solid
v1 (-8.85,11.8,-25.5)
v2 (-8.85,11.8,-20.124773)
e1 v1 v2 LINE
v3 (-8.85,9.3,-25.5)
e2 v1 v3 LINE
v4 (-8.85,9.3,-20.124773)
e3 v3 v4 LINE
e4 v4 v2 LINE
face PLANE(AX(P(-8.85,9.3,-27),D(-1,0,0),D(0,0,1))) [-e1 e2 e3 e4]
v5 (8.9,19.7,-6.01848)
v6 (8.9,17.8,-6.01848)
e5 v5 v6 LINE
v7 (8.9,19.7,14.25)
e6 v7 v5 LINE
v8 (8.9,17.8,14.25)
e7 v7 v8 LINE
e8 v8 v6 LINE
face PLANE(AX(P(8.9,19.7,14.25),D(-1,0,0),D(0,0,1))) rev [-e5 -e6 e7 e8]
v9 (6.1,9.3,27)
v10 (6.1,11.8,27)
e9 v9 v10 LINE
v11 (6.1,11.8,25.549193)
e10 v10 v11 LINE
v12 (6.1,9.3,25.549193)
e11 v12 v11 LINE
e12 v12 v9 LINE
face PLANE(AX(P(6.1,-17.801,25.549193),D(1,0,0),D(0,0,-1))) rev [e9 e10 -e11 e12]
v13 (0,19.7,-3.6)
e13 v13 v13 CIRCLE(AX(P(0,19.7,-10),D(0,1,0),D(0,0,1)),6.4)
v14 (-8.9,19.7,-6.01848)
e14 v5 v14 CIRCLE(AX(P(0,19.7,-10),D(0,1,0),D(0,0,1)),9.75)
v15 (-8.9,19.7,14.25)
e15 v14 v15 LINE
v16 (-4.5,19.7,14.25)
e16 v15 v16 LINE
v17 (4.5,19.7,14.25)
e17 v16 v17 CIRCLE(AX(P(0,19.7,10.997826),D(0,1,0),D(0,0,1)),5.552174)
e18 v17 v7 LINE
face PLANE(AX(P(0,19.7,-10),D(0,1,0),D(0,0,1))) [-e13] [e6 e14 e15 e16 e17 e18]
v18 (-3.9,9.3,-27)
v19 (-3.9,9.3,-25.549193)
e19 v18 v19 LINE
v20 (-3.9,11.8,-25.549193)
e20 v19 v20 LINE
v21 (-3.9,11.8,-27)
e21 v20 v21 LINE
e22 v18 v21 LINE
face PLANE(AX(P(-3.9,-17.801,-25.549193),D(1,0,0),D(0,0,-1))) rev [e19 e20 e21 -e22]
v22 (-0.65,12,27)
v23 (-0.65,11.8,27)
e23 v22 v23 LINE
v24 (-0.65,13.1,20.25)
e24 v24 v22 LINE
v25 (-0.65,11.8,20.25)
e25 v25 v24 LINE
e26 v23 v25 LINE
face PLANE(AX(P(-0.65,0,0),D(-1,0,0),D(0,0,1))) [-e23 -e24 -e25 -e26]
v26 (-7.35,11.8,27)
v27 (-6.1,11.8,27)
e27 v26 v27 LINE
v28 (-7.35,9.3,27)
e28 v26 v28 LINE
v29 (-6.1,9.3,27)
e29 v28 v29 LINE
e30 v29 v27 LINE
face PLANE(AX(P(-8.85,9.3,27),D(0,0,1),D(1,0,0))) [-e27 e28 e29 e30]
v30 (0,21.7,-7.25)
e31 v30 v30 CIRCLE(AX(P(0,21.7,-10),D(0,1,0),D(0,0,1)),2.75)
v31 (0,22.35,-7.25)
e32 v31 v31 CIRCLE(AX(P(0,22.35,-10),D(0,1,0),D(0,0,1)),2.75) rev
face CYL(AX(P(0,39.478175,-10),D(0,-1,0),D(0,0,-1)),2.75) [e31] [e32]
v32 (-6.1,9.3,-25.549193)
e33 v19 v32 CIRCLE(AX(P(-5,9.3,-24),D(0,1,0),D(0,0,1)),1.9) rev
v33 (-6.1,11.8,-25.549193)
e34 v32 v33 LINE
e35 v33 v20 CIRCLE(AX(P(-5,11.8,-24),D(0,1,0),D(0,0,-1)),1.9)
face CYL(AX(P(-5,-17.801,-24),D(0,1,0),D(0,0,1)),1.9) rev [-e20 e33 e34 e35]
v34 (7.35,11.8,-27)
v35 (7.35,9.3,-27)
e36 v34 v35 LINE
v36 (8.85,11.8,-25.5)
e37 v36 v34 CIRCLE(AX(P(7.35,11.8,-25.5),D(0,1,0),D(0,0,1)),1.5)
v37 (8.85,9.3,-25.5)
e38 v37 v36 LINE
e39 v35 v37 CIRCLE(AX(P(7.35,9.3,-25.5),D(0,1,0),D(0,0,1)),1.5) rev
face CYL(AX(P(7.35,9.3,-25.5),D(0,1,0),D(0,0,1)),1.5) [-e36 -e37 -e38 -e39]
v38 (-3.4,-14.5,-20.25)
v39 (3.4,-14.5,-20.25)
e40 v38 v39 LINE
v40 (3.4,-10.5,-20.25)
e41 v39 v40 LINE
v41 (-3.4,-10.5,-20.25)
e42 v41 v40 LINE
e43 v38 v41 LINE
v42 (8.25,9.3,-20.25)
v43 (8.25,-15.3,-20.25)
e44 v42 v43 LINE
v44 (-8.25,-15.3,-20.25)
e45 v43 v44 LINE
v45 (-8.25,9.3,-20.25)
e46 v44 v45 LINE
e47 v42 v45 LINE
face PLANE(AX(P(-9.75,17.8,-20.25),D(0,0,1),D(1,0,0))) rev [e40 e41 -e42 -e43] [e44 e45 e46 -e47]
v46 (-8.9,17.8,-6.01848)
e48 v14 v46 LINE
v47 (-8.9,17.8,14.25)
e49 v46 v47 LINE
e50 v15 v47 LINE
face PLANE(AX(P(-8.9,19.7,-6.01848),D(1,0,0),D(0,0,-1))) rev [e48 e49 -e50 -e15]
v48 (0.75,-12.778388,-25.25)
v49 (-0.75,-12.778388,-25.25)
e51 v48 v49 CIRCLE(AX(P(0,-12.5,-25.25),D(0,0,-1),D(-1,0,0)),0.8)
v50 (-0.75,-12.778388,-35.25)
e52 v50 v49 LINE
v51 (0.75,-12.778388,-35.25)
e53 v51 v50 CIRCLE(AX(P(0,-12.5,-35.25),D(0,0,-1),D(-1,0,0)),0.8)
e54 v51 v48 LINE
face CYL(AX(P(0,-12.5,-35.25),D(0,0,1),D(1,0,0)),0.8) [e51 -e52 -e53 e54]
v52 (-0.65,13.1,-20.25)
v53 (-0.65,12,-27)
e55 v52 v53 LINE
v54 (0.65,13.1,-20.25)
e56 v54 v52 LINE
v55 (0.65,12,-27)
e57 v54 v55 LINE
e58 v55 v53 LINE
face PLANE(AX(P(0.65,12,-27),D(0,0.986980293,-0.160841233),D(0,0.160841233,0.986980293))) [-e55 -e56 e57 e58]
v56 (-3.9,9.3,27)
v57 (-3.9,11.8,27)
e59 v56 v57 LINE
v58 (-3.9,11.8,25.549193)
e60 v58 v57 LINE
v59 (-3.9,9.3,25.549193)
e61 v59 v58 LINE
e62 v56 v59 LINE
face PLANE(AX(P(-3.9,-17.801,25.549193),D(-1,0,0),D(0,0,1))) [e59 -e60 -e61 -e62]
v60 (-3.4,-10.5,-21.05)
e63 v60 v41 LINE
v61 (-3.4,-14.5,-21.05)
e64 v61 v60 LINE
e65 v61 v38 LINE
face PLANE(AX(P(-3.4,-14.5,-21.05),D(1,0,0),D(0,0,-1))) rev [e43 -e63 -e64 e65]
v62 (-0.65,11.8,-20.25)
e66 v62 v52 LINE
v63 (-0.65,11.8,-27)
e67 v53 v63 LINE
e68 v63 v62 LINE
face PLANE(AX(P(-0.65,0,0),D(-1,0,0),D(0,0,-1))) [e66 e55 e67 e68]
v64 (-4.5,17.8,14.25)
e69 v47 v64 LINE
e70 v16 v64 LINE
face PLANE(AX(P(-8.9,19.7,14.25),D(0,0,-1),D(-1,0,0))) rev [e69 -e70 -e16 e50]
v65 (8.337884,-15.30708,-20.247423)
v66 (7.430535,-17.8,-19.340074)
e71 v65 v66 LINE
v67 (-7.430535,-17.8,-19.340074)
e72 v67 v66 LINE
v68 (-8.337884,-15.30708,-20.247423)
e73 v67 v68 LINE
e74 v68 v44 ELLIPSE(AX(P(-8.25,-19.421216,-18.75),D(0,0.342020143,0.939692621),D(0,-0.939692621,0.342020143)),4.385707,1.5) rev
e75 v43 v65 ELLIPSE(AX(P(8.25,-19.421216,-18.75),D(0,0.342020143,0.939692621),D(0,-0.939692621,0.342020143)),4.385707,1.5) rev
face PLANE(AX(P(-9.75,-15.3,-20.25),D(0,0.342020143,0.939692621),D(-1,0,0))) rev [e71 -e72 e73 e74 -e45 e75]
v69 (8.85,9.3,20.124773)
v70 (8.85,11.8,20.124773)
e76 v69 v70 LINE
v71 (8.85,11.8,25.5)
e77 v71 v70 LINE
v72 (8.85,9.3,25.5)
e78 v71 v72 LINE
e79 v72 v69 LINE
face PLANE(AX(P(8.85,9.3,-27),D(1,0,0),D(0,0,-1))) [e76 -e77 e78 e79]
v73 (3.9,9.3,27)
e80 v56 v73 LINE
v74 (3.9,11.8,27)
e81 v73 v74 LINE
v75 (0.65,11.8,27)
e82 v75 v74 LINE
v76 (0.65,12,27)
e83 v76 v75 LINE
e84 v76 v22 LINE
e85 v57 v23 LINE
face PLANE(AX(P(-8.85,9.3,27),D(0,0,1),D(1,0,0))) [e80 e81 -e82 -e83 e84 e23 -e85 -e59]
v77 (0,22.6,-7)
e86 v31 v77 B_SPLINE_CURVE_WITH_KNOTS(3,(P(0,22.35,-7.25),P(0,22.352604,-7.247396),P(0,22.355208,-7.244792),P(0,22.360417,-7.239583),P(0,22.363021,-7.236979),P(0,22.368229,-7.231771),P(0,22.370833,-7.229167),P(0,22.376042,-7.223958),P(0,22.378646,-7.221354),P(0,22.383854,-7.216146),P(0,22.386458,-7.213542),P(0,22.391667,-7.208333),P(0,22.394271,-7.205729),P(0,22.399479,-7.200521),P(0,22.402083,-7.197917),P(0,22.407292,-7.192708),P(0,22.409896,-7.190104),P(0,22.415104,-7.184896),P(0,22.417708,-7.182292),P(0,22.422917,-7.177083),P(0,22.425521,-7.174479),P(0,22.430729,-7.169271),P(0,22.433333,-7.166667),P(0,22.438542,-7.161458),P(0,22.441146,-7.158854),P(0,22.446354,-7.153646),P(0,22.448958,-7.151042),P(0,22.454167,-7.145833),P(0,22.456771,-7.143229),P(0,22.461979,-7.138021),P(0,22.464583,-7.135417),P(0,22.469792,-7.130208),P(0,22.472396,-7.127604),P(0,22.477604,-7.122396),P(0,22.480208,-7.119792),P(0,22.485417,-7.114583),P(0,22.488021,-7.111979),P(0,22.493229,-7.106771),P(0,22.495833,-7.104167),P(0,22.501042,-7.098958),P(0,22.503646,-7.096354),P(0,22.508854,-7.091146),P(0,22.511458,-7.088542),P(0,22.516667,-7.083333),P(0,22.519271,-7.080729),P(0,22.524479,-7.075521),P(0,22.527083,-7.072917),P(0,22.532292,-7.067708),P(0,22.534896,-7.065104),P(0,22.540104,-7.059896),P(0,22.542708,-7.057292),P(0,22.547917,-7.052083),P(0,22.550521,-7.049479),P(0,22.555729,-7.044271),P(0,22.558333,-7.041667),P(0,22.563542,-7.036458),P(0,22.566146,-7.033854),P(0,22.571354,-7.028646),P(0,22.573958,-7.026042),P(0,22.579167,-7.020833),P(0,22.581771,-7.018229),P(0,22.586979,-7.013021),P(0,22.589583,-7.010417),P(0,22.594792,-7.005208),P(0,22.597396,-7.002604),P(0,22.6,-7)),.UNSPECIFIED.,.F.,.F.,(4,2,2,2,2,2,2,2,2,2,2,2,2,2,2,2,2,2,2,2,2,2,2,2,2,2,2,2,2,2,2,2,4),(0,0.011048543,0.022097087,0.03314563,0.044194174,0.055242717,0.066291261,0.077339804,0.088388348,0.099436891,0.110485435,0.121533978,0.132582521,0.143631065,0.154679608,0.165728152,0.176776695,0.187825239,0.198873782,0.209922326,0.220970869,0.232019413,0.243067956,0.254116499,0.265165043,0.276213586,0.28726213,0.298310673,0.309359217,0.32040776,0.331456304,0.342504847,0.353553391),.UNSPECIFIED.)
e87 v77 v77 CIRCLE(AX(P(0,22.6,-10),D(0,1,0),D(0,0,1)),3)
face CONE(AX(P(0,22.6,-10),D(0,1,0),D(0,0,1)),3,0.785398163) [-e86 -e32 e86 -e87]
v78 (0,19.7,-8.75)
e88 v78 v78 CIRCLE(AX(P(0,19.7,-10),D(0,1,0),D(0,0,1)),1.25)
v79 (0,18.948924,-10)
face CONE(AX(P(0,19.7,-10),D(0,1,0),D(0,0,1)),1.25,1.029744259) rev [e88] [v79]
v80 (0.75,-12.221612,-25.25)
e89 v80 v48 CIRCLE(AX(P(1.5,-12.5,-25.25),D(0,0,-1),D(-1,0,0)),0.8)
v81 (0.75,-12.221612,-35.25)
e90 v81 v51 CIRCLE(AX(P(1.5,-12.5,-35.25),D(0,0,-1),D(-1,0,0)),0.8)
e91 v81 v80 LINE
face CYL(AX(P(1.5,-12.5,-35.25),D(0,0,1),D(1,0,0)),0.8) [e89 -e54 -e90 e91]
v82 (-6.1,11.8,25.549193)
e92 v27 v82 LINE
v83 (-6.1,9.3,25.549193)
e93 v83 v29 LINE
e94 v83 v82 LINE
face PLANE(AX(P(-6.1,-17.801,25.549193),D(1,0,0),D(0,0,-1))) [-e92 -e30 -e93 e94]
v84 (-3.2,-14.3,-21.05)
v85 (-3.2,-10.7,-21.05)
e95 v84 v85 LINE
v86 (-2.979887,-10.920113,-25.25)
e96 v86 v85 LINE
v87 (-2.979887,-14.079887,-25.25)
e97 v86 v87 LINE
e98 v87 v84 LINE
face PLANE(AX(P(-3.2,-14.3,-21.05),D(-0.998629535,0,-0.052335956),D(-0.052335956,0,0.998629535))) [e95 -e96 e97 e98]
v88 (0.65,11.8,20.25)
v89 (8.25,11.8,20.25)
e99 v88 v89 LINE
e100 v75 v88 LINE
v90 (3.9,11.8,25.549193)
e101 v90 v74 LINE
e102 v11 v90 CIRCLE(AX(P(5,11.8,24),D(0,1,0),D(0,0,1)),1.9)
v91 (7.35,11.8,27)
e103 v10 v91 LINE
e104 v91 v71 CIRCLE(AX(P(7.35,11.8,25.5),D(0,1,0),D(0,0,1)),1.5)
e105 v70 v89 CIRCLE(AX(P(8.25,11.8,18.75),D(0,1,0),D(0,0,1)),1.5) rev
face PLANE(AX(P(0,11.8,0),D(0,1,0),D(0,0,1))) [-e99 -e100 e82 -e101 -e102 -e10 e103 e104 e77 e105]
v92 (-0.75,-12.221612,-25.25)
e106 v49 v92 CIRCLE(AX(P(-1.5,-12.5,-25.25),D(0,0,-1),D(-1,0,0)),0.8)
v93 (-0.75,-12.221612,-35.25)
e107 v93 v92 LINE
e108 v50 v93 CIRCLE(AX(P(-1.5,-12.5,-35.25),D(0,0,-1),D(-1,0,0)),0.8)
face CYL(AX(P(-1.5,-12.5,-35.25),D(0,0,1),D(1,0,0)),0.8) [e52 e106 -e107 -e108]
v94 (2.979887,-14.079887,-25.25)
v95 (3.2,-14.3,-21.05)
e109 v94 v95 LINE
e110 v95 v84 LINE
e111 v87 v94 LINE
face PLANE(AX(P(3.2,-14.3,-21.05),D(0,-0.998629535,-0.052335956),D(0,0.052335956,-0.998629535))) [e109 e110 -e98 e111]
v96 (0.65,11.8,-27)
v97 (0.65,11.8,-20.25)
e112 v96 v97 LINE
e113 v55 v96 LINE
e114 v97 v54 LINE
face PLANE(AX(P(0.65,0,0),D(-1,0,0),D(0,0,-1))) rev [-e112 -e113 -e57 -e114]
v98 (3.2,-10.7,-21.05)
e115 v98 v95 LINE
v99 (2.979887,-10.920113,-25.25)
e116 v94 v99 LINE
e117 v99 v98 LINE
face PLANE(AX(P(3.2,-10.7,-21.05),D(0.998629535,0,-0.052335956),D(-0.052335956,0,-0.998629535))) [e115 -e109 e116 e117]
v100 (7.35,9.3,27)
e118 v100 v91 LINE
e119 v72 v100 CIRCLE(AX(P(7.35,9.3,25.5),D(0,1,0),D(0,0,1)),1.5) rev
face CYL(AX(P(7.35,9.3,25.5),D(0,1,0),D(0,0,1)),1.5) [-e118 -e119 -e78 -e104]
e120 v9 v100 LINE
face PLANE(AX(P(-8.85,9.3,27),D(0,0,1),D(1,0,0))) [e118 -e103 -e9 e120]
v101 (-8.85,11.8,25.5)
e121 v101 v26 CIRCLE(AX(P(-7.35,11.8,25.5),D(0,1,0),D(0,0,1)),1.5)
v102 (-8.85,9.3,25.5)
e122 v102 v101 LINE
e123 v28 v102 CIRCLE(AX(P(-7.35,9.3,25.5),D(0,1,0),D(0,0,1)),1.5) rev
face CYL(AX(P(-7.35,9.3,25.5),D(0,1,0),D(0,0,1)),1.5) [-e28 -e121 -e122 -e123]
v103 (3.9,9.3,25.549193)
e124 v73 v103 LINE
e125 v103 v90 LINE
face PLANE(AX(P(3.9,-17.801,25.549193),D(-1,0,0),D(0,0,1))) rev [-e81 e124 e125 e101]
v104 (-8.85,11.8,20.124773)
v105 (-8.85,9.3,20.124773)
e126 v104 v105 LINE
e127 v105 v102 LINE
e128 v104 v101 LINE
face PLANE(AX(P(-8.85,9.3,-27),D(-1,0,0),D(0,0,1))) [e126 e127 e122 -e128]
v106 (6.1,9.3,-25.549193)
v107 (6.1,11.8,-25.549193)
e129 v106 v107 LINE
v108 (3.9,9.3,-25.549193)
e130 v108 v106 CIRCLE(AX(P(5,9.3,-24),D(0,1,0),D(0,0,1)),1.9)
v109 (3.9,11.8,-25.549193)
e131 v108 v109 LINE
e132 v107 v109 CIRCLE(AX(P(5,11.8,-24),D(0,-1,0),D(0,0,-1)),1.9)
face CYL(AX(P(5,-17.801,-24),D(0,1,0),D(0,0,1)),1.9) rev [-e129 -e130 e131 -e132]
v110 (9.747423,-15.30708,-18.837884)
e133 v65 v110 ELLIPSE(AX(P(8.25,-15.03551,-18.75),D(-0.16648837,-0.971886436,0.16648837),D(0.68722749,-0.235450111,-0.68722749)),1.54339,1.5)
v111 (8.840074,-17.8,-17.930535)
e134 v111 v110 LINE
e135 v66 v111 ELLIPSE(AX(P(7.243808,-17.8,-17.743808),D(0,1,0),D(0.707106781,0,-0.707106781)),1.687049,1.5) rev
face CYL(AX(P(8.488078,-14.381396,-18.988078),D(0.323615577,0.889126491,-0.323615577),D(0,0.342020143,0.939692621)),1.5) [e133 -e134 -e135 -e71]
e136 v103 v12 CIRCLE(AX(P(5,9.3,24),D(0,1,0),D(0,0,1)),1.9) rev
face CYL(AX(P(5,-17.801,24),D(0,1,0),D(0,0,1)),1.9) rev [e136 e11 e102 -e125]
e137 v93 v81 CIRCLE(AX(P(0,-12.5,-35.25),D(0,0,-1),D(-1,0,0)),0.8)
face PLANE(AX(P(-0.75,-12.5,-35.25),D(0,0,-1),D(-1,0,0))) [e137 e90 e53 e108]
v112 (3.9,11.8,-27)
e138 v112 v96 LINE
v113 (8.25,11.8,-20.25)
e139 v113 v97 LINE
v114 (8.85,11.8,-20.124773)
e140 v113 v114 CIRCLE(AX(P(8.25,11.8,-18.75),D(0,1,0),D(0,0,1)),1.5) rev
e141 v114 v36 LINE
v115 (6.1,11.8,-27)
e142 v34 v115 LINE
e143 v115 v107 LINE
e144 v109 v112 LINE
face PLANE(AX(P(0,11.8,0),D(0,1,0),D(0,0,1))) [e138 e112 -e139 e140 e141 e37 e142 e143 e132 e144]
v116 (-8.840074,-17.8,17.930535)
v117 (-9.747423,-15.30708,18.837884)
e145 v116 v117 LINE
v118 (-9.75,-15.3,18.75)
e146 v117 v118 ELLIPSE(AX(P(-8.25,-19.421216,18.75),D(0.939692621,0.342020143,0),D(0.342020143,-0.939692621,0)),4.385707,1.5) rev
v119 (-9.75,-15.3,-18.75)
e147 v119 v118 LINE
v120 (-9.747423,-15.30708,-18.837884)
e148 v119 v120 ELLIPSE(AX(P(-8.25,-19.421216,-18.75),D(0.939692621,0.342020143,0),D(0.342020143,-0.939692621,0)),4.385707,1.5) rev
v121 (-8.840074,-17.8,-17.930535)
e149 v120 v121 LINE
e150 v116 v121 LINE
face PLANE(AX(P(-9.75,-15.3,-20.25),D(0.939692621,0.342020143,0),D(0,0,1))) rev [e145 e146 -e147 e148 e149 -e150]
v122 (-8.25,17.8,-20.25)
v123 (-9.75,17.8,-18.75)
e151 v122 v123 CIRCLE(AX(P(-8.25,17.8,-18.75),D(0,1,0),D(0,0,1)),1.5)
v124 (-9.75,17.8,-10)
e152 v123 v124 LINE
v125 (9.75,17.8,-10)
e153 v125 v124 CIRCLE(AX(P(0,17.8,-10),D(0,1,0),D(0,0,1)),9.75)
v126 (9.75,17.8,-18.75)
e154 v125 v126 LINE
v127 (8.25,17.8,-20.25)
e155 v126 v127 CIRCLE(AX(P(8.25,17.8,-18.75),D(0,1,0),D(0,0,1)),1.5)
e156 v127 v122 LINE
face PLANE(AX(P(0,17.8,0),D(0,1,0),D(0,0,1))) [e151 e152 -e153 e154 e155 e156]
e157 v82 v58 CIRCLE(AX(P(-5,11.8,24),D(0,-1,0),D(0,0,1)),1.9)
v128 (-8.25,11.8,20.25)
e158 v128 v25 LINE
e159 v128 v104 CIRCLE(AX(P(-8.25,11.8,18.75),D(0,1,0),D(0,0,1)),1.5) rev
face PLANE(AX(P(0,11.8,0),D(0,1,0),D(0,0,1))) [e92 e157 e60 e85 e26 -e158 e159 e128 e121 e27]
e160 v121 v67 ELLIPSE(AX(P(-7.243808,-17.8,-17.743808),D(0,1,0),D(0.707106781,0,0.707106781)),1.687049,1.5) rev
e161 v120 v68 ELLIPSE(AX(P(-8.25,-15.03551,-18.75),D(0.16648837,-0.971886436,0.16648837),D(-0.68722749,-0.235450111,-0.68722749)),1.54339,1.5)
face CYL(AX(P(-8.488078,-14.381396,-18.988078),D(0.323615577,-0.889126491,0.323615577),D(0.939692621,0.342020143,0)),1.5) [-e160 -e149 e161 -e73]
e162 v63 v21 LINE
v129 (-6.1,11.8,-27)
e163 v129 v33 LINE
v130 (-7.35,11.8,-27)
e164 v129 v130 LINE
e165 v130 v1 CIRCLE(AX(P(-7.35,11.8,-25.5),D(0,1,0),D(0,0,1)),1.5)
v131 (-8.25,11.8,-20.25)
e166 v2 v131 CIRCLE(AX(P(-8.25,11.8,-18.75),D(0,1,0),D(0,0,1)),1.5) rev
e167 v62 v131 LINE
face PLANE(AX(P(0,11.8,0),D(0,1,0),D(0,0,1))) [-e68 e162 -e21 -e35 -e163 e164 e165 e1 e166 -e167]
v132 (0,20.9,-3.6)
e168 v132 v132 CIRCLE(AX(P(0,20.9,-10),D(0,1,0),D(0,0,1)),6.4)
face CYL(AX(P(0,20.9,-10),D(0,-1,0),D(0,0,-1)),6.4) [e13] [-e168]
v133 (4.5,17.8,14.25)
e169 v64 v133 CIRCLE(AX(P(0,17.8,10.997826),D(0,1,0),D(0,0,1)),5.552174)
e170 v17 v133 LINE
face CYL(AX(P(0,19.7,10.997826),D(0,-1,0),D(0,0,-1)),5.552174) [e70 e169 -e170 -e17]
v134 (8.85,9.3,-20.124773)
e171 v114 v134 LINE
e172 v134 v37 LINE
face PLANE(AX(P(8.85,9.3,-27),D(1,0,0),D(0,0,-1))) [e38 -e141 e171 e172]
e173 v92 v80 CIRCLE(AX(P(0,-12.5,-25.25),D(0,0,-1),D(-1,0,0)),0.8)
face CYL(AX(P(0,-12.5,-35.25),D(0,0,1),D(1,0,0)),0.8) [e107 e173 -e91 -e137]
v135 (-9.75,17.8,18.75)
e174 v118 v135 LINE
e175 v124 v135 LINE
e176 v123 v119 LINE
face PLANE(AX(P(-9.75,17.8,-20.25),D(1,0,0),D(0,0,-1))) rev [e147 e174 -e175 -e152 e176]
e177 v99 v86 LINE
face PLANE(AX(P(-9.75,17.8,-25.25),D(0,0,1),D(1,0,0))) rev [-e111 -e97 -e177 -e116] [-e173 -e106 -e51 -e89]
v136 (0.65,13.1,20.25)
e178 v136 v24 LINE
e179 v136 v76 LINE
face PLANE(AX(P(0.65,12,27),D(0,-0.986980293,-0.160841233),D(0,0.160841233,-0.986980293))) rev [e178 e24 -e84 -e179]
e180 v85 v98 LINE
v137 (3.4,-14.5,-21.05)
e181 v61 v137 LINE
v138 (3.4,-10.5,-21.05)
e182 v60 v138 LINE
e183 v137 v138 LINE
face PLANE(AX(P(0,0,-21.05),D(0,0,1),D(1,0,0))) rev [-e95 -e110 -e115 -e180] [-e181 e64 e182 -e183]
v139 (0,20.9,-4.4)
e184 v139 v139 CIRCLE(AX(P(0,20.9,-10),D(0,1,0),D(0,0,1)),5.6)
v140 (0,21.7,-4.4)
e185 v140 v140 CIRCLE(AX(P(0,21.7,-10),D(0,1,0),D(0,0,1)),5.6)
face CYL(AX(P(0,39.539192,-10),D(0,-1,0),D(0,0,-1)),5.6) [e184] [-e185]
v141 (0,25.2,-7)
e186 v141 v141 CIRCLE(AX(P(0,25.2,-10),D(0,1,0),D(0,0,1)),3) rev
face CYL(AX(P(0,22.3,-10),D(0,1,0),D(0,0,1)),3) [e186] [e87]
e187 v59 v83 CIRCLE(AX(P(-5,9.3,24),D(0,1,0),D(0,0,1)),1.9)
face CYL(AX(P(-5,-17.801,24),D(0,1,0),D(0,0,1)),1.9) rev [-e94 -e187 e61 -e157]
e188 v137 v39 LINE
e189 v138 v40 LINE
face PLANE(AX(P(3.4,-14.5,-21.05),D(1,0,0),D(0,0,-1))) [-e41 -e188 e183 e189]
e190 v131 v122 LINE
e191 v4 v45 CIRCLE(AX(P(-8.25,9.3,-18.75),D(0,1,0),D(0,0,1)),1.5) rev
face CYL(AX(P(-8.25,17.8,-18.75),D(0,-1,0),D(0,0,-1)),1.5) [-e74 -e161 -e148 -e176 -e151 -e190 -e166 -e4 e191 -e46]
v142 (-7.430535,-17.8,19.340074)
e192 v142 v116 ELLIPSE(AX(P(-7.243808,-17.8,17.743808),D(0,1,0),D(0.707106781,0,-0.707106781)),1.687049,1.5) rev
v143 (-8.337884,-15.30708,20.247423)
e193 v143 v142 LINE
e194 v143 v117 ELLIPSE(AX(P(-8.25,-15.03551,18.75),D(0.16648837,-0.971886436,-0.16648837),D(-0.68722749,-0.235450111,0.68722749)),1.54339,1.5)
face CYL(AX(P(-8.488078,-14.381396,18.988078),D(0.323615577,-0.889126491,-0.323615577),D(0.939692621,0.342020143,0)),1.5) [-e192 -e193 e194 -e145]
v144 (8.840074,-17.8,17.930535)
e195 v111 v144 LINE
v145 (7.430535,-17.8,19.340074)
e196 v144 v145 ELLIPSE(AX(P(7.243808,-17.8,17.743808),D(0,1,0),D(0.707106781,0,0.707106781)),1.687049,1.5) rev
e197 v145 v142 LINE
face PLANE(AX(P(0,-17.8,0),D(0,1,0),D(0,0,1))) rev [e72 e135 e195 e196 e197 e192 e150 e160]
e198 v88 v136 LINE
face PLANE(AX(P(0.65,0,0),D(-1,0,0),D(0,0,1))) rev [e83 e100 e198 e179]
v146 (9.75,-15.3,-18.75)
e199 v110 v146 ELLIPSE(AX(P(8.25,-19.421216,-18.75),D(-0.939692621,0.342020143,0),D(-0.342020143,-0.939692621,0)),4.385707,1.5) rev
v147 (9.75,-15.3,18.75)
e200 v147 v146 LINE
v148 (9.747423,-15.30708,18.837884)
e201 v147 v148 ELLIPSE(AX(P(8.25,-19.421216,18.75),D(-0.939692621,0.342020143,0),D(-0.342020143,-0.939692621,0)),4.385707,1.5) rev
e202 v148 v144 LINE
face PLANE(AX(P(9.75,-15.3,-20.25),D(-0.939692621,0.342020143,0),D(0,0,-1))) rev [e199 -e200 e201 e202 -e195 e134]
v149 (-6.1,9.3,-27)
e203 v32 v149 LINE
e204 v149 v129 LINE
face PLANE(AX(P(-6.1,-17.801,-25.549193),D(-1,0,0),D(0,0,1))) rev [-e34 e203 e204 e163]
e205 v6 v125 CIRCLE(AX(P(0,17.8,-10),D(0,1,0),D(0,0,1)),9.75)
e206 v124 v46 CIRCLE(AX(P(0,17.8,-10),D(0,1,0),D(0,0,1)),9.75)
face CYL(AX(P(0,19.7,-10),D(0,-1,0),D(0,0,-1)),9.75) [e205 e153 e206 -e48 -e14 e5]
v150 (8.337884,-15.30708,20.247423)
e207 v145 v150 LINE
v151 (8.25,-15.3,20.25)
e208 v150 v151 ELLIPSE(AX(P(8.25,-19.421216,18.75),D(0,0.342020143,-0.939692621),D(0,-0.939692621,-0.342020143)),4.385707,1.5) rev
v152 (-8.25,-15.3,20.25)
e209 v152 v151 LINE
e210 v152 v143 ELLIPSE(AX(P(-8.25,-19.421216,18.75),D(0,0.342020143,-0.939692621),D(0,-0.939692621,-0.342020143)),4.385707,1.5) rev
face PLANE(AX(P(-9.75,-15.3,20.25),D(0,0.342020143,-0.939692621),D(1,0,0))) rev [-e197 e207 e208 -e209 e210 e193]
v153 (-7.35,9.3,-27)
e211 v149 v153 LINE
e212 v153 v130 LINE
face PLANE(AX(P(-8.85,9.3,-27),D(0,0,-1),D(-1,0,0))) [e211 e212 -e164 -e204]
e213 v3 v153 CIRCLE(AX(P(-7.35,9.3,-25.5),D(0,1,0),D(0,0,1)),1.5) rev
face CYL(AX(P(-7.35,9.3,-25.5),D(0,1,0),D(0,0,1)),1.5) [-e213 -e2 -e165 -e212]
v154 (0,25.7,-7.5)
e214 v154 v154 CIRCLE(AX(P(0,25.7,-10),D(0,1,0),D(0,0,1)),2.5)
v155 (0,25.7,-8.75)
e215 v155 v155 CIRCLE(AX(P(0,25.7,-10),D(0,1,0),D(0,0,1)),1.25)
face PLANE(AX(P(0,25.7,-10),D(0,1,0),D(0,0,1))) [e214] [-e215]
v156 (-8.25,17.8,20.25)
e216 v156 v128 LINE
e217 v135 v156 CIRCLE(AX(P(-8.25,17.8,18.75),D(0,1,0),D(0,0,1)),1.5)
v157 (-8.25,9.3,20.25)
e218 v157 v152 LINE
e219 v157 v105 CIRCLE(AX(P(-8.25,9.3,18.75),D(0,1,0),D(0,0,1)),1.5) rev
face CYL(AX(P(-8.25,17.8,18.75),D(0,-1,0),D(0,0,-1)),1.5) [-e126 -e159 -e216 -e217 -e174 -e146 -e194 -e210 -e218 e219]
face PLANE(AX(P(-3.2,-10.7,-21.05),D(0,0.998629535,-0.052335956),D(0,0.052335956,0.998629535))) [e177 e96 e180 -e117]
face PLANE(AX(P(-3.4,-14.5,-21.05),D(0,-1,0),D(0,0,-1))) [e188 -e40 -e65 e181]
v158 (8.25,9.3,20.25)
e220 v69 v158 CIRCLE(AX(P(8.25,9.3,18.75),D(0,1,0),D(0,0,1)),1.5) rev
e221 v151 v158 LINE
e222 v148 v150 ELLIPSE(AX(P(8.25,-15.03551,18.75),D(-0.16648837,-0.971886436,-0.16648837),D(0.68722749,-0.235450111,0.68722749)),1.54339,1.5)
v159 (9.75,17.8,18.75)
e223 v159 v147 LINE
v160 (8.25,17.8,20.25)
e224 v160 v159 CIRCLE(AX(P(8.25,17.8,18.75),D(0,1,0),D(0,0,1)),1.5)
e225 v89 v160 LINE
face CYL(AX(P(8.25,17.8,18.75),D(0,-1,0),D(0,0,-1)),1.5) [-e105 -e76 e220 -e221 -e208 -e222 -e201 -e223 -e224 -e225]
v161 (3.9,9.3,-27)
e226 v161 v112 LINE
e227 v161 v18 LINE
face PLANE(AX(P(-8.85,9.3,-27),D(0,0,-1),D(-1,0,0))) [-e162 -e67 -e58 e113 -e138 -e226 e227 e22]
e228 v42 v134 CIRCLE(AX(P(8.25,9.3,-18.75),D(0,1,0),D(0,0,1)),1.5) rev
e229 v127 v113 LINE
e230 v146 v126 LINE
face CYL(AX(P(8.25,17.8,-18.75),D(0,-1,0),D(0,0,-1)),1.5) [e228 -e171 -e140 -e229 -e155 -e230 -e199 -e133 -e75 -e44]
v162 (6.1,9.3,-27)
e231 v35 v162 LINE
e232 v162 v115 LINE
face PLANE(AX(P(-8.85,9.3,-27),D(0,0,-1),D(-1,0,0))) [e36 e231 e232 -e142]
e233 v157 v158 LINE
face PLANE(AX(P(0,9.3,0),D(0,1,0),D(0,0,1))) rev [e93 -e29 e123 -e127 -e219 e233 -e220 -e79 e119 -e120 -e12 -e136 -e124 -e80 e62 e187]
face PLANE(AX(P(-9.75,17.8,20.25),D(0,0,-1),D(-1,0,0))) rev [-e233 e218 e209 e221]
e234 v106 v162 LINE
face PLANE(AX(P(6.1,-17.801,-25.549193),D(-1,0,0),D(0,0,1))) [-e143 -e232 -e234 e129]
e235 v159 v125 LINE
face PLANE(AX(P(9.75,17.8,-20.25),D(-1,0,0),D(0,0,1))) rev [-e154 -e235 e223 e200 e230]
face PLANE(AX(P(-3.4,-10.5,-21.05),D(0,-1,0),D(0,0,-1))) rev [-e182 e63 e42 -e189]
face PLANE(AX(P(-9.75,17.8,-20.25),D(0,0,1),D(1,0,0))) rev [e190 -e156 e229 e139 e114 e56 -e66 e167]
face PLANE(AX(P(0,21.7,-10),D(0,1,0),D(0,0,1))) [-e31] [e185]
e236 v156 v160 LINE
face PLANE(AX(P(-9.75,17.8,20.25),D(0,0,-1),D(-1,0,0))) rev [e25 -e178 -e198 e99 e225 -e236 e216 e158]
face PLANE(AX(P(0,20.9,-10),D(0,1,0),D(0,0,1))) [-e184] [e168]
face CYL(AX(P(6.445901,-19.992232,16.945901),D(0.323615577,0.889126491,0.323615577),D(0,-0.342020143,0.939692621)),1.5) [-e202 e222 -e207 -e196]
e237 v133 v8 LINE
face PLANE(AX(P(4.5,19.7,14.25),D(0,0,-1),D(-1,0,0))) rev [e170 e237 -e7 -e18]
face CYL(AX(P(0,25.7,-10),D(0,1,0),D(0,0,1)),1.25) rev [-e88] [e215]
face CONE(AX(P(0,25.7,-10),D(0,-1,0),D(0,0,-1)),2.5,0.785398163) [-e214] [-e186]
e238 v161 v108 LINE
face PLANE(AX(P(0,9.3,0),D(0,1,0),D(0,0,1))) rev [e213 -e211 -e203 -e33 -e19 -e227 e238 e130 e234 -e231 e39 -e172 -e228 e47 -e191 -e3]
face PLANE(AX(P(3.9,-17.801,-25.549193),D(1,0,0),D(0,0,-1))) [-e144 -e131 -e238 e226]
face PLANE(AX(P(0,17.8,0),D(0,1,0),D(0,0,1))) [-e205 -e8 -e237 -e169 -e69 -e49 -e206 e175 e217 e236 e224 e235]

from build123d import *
from OCP.BRepFilletAPI import BRepFilletAPI_MakeChamfer

# Parameters (mm, degrees)
SKETCH2_W                 = 19.5
SKETCH2_H                 = 40.5
BOSS_EXTRUDE1_DEPTH       = 17.8
CHAMFER1_SIZE             = 2.5
CHAMFER1_SIZE2            = 0.909925586
FILLET1_R                 = 1.5
BOSS_EXTRUDE2_START       = -6
SKETCH3_W                 = 17.7
SKETCH3_H                 = 54
BOSS_EXTRUDE2_DEPTH       = 2.5
FILLET2_R                 = 1.5
BOSS_EXTRUDE3_DEPTH       = 0.65
BOSS_EXTRUDE4_DEPTH       = 1.9
SKETCH6_R                 = 6.4
BOSS_EXTRUDE5_DEPTH       = 1.2
SKETCH7_R                 = 5.6
BOSS_EXTRUDE6_DEPTH       = 0.8
SKETCH8_R                 = 2.75
BOSS_EXTRUDE7_DEPTH       = 4
SKETCH9_R                 = 3
BOSS_EXTRUDE8_DEPTH       = 3.4
CHAMFER2_SIZE             = 0.3
CHAMFER3_SIZE             = 0.5
CUT_EXTRUDE1_REACH        = 43.234
MIRROR3_COPY_1_REACH      = 43.234
SKETCH12_W                = 6.8
SKETCH12_H                = 4
BOSS_EXTRUDE9_DEPTH       = 0.8
SKETCH13_W                = 6.4
SKETCH13_H                = 3.6
BOSS_EXTRUDE10_DEPTH      = 4.2
BOSS_EXTRUDE10_TAPER      = 3
BOSS_EXTRUDE11_DEPTH      = 10
M3X0_5_TAPPED_HOLE1_D     = 2.5
M3X0_5_TAPPED_HOLE1_DEPTH = 6
M3X0_5_TAPPED_HOLE1_TIP   = 0.751075774


with BuildPart() as part:
    # Sketch2 → Boss-Extrude1 (new, symmetric)
    with BuildSketch(Plane(origin=(0, 0, 0), x_dir=(1, 0, 0), z_dir=(0, 1, 0))):
        Rectangle(SKETCH2_W, SKETCH2_H)
    extrude(amount=BOSS_EXTRUDE1_DEPTH, both=True)

    # Chamfer1: one chamfer whose edges measure the first distance from different faces: ONE call of the kernel's chamfer builder (chamfer() names one face for all edges)
    chamfer1_edges_1 = [part.edges().sort_by_distance(p)[0] for p in [
        (0, -17.8, -20.25),
    ]]
    chamfer1_side_1 = [part.faces().sort_by_distance(p)[0] for p in [
        (0, 0, -20.25),
    ]]
    chamfer1_edges_2 = [part.edges().sort_by_distance(p)[0] for p in [
        (9.75, -17.8, 0),
    ]]
    chamfer1_side_2 = [part.faces().sort_by_distance(p)[0] for p in [
        (9.75, 0, 0),
    ]]
    chamfer1_edges_3 = [part.edges().sort_by_distance(p)[0] for p in [
        (0, -17.8, 20.25),
    ]]
    chamfer1_side_3 = [part.faces().sort_by_distance(p)[0] for p in [
        (0, 0, 20.25),
    ]]
    chamfer1_edges_4 = [part.edges().sort_by_distance(p)[0] for p in [
        (-9.75, -17.8, 0),
    ]]
    chamfer1_side_4 = [part.faces().sort_by_distance(p)[0] for p in [
        (-9.75, 0, 0),
    ]]
    chamfer1 = BRepFilletAPI_MakeChamfer(part.part.solid().wrapped)
    for e in chamfer1_edges_1:
        chamfer1.Add(CHAMFER1_SIZE, CHAMFER1_SIZE2, e.wrapped, chamfer1_side_1[0].wrapped)  # the first distance lies on this face
    for e in chamfer1_edges_2:
        chamfer1.Add(CHAMFER1_SIZE, CHAMFER1_SIZE2, e.wrapped, chamfer1_side_2[0].wrapped)  # the first distance lies on this face
    for e in chamfer1_edges_3:
        chamfer1.Add(CHAMFER1_SIZE, CHAMFER1_SIZE2, e.wrapped, chamfer1_side_3[0].wrapped)  # the first distance lies on this face
    for e in chamfer1_edges_4:
        chamfer1.Add(CHAMFER1_SIZE, CHAMFER1_SIZE2, e.wrapped, chamfer1_side_4[0].wrapped)  # the first distance lies on this face
    add(Compound.cast(chamfer1.Shape()), mode=Mode.REPLACE)

    # Fillet1
    # the kernel refuses this fillet: 1.5 mm, written as the material it takes off along each edge
    with BuildSketch(Plane(origin=(-10.829006934, -12.335452813, -21.329006934), x_dir=(0.9461886483394649, 0.3040991697893321, -0.11068304606838018), z_dir=(0.3236155771181854, -0.8891264907159878, 0.32361557711818534)), Plane(origin=(-10.829006934, -12.335452813, 21.329006934), x_dir=(-0.1106830460683806, 0.30409916978933194, -0.946188648339465), z_dir=(0.32361557711818534, -0.8891264907159879, -0.3236155771181854))) as fillet1_piece_1:
        with BuildLine():
            CenterArc((FILLET1_R * 0.889126490716, FILLET1_R), FILLET1_R, 186.717713464, 83.282286536)
            Line((-FILLET1_R * 0.104008041637, FILLET1_R * 0.883022221559), (0, 0))
            Line((0, 0), (FILLET1_R * 0.889126490716, 0))
        make_face()
    extrude(amount=9.480197094, mode=Mode.SUBTRACT)
    with BuildSketch(Plane(origin=(10.829006934, -12.335452813, -21.329006934), x_dir=(-0.946188648339465, 0.30409916978933194, -0.1106830460683806), z_dir=(-0.3236155771181854, -0.8891264907159879, 0.3236155771181854)), Plane(origin=(10.829006934, -12.335452813, 21.329006934), x_dir=(0.11068304606838136, 0.3040991697893317, -0.9461886483394651), z_dir=(-0.3236155771181854, -0.8891264907159879, -0.3236155771181854))) as fillet1_piece_2:
        with BuildLine():
            CenterArc((FILLET1_R * 0.889126490716, -FILLET1_R), FILLET1_R, 90, 83.282286536)
            Line((-FILLET1_R * 0.104008041637, -FILLET1_R * 0.883022221559), (0, 0))
            Line((0, 0), (FILLET1_R * 0.889126490716, 0))
        make_face()
    extrude(amount=9.480197094, mode=Mode.SUBTRACT)
    with BuildSketch(Plane(origin=(-9.75, -19.05, -20.25), x_dir=(1, 0, 0), z_dir=(0, 1, 0)), Plane(origin=(9.75, 21.55, -20.25), x_dir=(-1, 0, 0), z_dir=(0, -1, 0)), Plane(origin=(9.75, 21.55, 20.25), x_dir=(0, 0, -1), z_dir=(0, -1, 0)), Plane(origin=(-9.75, -19.05, 20.25), x_dir=(0, 0, -1), z_dir=(0, 1, 0))) as fillet1_piece_3:
        with BuildLine():
            CenterArc((FILLET1_R, -FILLET1_R), FILLET1_R, 90, 90)
            Line((0, -FILLET1_R), (0, 0))
            Line((0, 0), (FILLET1_R, 0))
        make_face()
    extrude(amount=40.6, mode=Mode.SUBTRACT)

    # Sketch3 → Boss-Extrude2 (add)
    with BuildSketch(Plane(origin=(0, 17.8, 0), x_dir=(1, 0, 0), z_dir=(0, 1, 0)).offset(BOSS_EXTRUDE2_START)):
        Rectangle(SKETCH3_W, SKETCH3_H)
    extrude(amount=-BOSS_EXTRUDE2_DEPTH)

    # Fillet2
    fillet2_edges = [part.edges().sort_by_distance(p)[0] for p in [
        (-8.85, 10.55, 27),
        (8.85, 10.55, -27),
        (-8.85, 10.55, -27),
        (8.85, 10.55, 27),
    ]]
    fillet(fillet2_edges, radius=FILLET2_R)

    # Sketch4 → Boss-Extrude3 (add, symmetric)
    with BuildSketch(Plane(origin=(0, 0, 0), x_dir=(0, 0, -1), z_dir=(1, 0, 0))):
        Polygon((-20.25, 11.8), (-27, 11.8), (-27, 12), (-20.25, 13.1), align=None)
    boss_extrude3 = extrude(amount=BOSS_EXTRUDE3_DEPTH, both=True)

    # Mirror1: Boss-Extrude3 across plane
    add(boss_extrude3.mirror(Plane.XY))

    # Sketch5 → Boss-Extrude4 (add)
    with BuildSketch(Plane(origin=(0, 17.8, 0), x_dir=(1, 0, 0), z_dir=(0, 1, 0))):
        with BuildLine():
            Line((-8.9, 6.01848019), (-8.9, -14.25))
            Line((-8.9, -14.25), (-4.5, -14.25))
            ThreePointArc((-4.5, -14.25), (0, -16.55), (4.5, -14.25))
            Line((4.5, -14.25), (8.9, -14.25))
            Line((8.9, -14.25), (8.9, 6.01848019))
            ThreePointArc((8.9, 6.01848019), (0, 19.75), (-8.9, 6.01848019))
        make_face()
    extrude(amount=BOSS_EXTRUDE4_DEPTH)

    # Sketch6 → Boss-Extrude5 (add)
    with BuildSketch(Plane(origin=(0, 19.7, 0), x_dir=(1, 0, 0), z_dir=(0, 1, 0))):
        with Locations(Location((0, 10, 0), (0, 0, 270))):
            Circle(SKETCH6_R)
    extrude(amount=BOSS_EXTRUDE5_DEPTH)

    # Sketch7 → Boss-Extrude6 (add)
    with BuildSketch(Plane(origin=(0, 20.9, 0), x_dir=(1, 0, 0), z_dir=(0, 1, 0))):
        with Locations(Location((0, 10, 0), (0, 0, 270))):
            Circle(SKETCH7_R)
    extrude(amount=BOSS_EXTRUDE6_DEPTH)

    # Sketch8 → Boss-Extrude7 (add)
    with BuildSketch(Plane(origin=(0, 21.7, 0), x_dir=(1, 0, 0), z_dir=(0, 1, 0))):
        with Locations(Location((0, 10, 0), (0, 0, 270))):
            Circle(SKETCH8_R)
    extrude(amount=BOSS_EXTRUDE7_DEPTH)

    # Sketch9 → Boss-Extrude8 (add)
    with BuildSketch(Plane(origin=(0, 25.7, 0), x_dir=(1, 0, 0), z_dir=(0, 1, 0))):
        with Locations(Location((0, 10, 0), (0, 0, 270))):
            Circle(SKETCH9_R)
    extrude(amount=-BOSS_EXTRUDE8_DEPTH)

    # Chamfer2
    # the kernel refuses this chamfer: 0.3 mm, written as the material it takes off along each edge
    with BuildSketch(Plane(origin=(0, 22.3, -10), x_dir=(0, 0, 1), z_dir=(-1, 0, 0))) as chamfer2_piece_1_section:
        Polygon((3 - CHAMFER2_SIZE, 0), (3, CHAMFER2_SIZE), (3, 0), align=None)
    chamfer2_piece_1 = revolve(axis=Axis((0, 22.3, -10), (0, 1, 0)), mode=Mode.PRIVATE)
    chamfer2_piece_1 = chamfer2_piece_1 - Plane(origin=(0, 22.47249354, -10), x_dir=(0, 0, 1), z_dir=(0, -1, 0)) * Cylinder(2.75, 12, mode=Mode.PRIVATE)
    add(chamfer2_piece_1, mode=Mode.SUBTRACT)

    # Chamfer3
    chamfer3_edges = [part.edges().sort_by_distance(p)[0] for p in [
        (0, 25.7, -13),
    ]]
    chamfer(chamfer3_edges, length=CHAMFER3_SIZE)

    # Sketch11 → Cut-Extrude1 (cut, up to next)
    with BuildSketch(Plane(origin=(0, 11.8, 0), x_dir=(1, 0, 0), z_dir=(0, 1, 0)), mode=Mode.PRIVATE) as cut_extrude1_sk1:
        with BuildLine():
            Line((6.1, -27), (3.9, -27))
            Line((3.9, -27), (3.9, -25.549193338))
            ThreePointArc((3.9, -25.549193338), (5, -22.1), (6.1, -25.549193338))
            Line((6.1, -25.549193338), (6.1, -27))
        make_face()
    cut_extrude1_tool1 = extrude(cut_extrude1_sk1.sketch, amount=-CUT_EXTRUDE1_REACH, mode=Mode.PRIVATE) & part.part
    cut_extrude1 = cut_extrude1_tool1.solids().sort_by_distance((5, 11.8, 24.454928))[0]
    add(cut_extrude1, mode=Mode.SUBTRACT)

    # Mirror2: Cut-Extrude1 across plane
    add(cut_extrude1.mirror(Plane(origin=(0, 0, 0), x_dir=(0, 0, 1), z_dir=(1, 0, 0))), mode=Mode.SUBTRACT)

    # Mirror3: Cut-Extrude1 across plane
    add(cut_extrude1.mirror(Plane.XY), mode=Mode.SUBTRACT)

    # Mirror3 copy 1 sketch → Mirror3 copy 1 (cut, up to next)
    with BuildSketch(Plane(origin=(0, 11.8, 0), x_dir=(-1, 0, 0), z_dir=(0, 1, 0)), mode=Mode.PRIVATE) as mirror3_copy_1_sk1:
        with BuildLine():
            Line((6.1, -27), (3.9, -27))
            Line((3.9, -27), (3.9, -25.549193338))
            ThreePointArc((3.9, -25.549193338), (5, -22.1), (6.1, -25.549193338))
            Line((6.1, -25.549193338), (6.1, -27))
        make_face()
    mirror3_copy_1_tool1 = extrude(mirror3_copy_1_sk1.sketch, amount=-MIRROR3_COPY_1_REACH, mode=Mode.PRIVATE) & part.part
    add(mirror3_copy_1_tool1.solids().sort_by_distance((-5, 11.8, -24.454928))[0], mode=Mode.SUBTRACT)

    # Sketch12 → Boss-Extrude9 (add)
    with BuildSketch(Plane.XY.offset(-20.25)):
        with Locations((0, -12.5)):
            Rectangle(SKETCH12_W, SKETCH12_H)
    extrude(amount=-BOSS_EXTRUDE9_DEPTH)

    # Sketch13 → Boss-Extrude10 (add)
    with BuildSketch(Plane(origin=(0, 0, -21.05), x_dir=(-1, 0, 0), z_dir=(0, 0, -1))):
        with Locations((0, -12.5)):
            Rectangle(SKETCH13_W, SKETCH13_H)
    extrude(amount=BOSS_EXTRUDE10_DEPTH, taper=BOSS_EXTRUDE10_TAPER)

    # Sketch14 → Boss-Extrude11 (add)
    with BuildSketch(Plane(origin=(0, 0, -25.25), x_dir=(-1, 0, 0), z_dir=(0, 0, -1))):
        with BuildLine():
            ThreePointArc((0.75, -12.778388218), (2.3, -12.5), (0.75, -12.221611782))
            ThreePointArc((0.75, -12.221611782), (0, -11.7), (-0.75, -12.221611782))
            ThreePointArc((-0.75, -12.221611782), (-2.3, -12.5), (-0.75, -12.778388218))
            ThreePointArc((-0.75, -12.778388218), (0, -13.3), (0.75, -12.778388218))
        make_face()
    extrude(amount=BOSS_EXTRUDE11_DEPTH)

    # M3x0.5 Tapped Hole1
    with Locations(Plane(origin=(0, 25.7, 0), x_dir=(1, 0, 0), z_dir=(0, 1, 0))):
        with Locations((0, 10)):
            Hole(M3X0_5_TAPPED_HOLE1_D / 2, depth=M3X0_5_TAPPED_HOLE1_DEPTH)
            with Locations((0, 0, -(M3X0_5_TAPPED_HOLE1_DEPTH + M3X0_5_TAPPED_HOLE1_TIP / 2))):  # 118° drill point
                Cone(0, M3X0_5_TAPPED_HOLE1_D / 2, M3X0_5_TAPPED_HOLE1_TIP, mode=Mode.SUBTRACT)


solid = part.part
